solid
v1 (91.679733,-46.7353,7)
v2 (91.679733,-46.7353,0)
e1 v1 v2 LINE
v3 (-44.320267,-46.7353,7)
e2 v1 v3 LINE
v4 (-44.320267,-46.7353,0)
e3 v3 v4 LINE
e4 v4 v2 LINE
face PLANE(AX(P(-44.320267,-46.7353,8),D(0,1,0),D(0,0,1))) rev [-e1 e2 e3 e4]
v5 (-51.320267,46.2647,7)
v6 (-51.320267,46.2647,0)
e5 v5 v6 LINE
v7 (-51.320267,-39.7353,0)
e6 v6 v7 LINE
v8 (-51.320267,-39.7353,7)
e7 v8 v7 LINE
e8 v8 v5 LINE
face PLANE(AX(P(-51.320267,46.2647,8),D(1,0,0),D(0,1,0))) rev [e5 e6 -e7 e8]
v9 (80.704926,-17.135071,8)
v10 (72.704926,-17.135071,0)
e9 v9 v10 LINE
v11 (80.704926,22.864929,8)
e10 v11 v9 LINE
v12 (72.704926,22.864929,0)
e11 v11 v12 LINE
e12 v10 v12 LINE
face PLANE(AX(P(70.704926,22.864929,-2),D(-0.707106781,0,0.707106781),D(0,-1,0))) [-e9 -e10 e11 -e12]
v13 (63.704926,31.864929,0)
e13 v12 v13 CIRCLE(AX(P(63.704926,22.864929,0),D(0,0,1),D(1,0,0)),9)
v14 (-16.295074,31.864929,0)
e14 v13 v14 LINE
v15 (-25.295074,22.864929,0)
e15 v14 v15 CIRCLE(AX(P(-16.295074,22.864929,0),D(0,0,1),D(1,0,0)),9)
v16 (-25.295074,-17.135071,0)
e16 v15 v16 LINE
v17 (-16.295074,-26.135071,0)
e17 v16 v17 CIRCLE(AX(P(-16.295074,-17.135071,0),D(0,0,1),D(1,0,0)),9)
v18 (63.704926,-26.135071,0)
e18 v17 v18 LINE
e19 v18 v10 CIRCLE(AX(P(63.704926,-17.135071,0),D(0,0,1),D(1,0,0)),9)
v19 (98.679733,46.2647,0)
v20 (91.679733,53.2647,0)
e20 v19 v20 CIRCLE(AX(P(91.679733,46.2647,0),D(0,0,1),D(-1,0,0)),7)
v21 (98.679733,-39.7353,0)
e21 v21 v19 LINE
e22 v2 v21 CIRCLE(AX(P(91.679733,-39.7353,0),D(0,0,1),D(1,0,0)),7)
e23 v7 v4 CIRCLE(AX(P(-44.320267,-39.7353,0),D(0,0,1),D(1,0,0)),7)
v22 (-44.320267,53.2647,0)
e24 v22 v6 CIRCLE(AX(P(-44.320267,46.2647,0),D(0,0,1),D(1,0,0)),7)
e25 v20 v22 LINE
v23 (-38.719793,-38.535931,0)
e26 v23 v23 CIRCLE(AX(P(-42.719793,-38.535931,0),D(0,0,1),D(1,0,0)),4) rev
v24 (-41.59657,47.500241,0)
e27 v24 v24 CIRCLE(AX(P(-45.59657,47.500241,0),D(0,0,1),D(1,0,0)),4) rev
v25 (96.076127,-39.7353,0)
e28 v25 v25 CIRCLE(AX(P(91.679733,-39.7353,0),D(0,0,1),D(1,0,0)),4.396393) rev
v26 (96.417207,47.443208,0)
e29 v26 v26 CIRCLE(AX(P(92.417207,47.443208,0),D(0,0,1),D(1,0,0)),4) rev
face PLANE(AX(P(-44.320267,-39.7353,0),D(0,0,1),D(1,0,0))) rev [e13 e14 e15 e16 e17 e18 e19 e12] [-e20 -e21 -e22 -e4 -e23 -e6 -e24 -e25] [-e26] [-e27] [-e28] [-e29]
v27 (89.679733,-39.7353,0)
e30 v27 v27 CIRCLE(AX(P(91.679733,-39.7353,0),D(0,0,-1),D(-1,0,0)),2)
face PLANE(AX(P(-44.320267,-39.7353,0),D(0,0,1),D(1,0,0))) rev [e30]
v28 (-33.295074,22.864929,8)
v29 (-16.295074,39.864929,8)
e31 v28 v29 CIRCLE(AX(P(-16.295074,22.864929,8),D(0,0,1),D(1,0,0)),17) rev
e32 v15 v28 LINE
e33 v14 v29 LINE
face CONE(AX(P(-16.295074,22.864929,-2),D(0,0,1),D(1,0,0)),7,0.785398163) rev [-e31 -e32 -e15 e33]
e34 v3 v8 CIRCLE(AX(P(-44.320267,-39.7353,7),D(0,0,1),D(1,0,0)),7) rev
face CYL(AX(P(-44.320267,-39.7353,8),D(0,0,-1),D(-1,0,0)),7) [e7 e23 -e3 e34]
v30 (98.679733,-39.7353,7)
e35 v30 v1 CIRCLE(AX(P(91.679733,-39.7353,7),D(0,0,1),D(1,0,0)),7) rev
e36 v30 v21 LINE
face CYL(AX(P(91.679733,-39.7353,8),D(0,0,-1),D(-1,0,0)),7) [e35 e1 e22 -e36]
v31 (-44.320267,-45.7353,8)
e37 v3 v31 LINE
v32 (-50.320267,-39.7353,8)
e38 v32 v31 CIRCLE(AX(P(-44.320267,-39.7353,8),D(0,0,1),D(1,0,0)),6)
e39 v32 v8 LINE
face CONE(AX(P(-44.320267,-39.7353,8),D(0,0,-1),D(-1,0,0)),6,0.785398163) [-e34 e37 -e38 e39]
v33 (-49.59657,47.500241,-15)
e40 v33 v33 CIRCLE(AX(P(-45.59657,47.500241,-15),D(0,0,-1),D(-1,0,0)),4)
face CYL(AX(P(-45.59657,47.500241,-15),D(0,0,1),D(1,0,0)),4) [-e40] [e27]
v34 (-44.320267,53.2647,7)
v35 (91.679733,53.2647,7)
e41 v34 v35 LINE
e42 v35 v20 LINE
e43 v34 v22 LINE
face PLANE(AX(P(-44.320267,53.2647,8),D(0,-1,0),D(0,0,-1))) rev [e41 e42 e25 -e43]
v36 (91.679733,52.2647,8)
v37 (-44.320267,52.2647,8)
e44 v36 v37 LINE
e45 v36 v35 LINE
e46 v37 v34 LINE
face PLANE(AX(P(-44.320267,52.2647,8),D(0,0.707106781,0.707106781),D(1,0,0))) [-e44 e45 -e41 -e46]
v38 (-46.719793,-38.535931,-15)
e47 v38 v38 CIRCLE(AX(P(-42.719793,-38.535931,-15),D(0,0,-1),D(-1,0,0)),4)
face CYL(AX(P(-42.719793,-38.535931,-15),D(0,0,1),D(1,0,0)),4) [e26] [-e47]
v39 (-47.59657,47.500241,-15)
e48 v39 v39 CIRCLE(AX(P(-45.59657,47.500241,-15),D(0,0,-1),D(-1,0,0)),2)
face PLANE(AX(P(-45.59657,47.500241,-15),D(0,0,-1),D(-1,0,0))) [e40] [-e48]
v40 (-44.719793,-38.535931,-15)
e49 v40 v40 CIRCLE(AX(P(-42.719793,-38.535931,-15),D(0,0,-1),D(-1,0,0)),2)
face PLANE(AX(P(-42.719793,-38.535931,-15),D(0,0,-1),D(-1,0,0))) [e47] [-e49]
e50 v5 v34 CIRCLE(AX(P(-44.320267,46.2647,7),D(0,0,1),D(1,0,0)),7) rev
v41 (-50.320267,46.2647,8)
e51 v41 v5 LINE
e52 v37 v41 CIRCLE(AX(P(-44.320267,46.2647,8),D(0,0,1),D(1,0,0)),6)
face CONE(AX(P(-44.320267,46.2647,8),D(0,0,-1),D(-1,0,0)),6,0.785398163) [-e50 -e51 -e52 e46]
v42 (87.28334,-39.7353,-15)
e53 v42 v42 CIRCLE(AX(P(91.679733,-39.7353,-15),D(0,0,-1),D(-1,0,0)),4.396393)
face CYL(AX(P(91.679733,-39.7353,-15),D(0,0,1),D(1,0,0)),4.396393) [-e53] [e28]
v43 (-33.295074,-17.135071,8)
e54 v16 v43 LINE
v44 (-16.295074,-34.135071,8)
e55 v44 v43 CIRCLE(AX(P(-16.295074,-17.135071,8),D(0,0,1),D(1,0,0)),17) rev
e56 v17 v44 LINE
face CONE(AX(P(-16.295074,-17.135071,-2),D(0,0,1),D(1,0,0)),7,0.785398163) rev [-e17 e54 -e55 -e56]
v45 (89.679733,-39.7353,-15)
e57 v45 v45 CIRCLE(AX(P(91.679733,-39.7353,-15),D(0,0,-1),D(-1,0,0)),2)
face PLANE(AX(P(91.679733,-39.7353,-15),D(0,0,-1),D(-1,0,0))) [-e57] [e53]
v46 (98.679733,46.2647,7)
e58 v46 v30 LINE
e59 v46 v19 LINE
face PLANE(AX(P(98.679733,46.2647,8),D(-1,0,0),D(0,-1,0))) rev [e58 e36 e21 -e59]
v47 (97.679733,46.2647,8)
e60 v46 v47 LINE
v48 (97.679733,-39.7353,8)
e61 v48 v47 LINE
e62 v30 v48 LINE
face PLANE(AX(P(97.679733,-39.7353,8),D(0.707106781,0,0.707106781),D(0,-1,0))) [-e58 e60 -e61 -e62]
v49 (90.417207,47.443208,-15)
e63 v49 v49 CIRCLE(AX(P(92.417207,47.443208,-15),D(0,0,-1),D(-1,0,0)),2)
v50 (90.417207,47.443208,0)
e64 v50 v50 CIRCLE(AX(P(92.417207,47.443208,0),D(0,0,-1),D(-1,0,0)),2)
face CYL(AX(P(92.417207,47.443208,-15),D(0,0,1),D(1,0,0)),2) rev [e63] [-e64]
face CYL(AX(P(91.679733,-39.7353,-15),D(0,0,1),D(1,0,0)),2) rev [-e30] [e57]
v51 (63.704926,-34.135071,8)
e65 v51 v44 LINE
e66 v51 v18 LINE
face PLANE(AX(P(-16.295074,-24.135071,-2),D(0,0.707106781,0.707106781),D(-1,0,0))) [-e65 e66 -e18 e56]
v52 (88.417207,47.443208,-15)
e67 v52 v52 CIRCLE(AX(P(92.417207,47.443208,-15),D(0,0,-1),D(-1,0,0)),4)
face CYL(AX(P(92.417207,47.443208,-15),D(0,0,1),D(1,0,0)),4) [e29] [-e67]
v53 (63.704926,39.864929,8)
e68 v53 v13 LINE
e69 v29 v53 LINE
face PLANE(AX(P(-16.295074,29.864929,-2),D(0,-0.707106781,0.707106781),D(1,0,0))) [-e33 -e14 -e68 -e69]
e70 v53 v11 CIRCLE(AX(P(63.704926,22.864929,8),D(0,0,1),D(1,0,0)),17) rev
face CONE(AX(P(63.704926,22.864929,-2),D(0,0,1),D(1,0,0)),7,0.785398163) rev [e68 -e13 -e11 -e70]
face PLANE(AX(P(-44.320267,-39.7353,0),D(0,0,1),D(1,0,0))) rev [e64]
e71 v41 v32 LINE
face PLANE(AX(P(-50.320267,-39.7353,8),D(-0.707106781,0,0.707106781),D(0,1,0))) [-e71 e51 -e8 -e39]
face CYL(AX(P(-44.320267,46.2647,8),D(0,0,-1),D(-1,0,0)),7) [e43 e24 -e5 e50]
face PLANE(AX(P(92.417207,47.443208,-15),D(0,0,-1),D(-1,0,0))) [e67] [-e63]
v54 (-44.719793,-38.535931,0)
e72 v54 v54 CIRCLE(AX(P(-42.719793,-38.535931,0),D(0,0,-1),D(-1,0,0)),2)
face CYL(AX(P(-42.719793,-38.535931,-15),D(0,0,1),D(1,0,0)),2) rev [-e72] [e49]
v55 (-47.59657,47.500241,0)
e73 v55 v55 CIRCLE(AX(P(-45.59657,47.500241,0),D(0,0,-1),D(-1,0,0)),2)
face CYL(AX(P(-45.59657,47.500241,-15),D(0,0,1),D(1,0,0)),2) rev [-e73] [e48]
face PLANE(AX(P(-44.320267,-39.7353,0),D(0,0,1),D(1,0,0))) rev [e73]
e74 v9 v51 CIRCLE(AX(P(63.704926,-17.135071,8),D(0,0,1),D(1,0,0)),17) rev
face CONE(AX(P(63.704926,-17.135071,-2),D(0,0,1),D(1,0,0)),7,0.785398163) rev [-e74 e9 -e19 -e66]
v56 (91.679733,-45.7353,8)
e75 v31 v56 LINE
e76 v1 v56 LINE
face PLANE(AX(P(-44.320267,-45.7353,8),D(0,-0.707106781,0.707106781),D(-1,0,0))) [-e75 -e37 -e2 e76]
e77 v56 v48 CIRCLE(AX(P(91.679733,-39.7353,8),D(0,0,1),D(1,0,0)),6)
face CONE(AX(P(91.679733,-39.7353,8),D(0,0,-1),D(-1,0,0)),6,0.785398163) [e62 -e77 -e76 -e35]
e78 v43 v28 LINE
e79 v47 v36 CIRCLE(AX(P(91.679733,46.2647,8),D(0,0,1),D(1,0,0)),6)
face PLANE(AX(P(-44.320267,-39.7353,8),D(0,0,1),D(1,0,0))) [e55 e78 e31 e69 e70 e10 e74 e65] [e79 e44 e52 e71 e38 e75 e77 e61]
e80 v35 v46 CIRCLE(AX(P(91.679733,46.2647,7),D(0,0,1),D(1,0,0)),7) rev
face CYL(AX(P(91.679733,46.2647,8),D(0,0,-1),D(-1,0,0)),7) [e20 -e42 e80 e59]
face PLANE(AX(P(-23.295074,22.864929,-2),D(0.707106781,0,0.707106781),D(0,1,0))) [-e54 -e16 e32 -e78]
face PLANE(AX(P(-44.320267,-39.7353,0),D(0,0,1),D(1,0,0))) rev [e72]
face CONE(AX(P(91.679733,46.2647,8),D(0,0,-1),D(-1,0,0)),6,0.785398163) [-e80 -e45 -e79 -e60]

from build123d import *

# Parameters (mm, degrees)
EXTRUDE_1_DEPTH     = 8
CUT_EXTRUDE_1_DEPTH = 8
CHAMFER_2_SIZE      = 1
SKETCH_3_R          = 4
SKETCH_3_R_2        = 2
EXTRUDE_3_DEPTH     = 15
SKETCH_5_R          = 4.396393258
SKETCH_5_R_2        = 2
EXTRUDE_4_DEPTH     = 15
SKETCH_9_R          = 4
SKETCH_9_R_2        = 2
EXTRUDE_5_DEPTH     = 15
SKETCH_10_R         = 4
SKETCH_10_R_2       = 2
EXTRUDE_6_DEPTH     = 15
CHAMFER_6_SIZE      = 10


with BuildPart() as part:
    # 草图1 → 凸台-拉伸1 (new body)
    with BuildSketch(Plane.XY):
        with BuildLine():
            Line((-44.320266629, 53.264700042), (91.679733371, 53.264700042))
            ThreePointArc((91.679733371, 53.264700042), (96.629480839, 51.21444751), (98.679733371, 46.264700042))
            Line((98.679733371, 46.264700042), (98.679733371, -39.735299958))
            ThreePointArc((98.679733371, -39.735299958), (96.629480839, -44.685047426), (91.679733371, -46.735299958))
            Line((91.679733371, -46.735299958), (-44.320266629, -46.735299958))
            ThreePointArc((-44.320266629, -46.735299958), (-49.270014098, -44.685047426), (-51.320266629, -39.735299958))
            Line((-51.320266629, -39.735299958), (-51.320266629, 46.264700042))
            ThreePointArc((-51.320266629, 46.264700042), (-49.270014098, 51.21444751), (-44.320266629, 53.264700042))
        make_face()
    extrude(amount=EXTRUDE_1_DEPTH)

    # 草图2 → 切除-拉伸1 (cut)
    with BuildSketch(Plane.XY.offset(8)):
        with BuildLine():
            Line((-16.295074043, 29.864928603), (63.704925957, 29.864928603))
            ThreePointArc((63.704925957, 29.864928603), (68.654673426, 27.814676072), (70.704925957, 22.864928603))
            Line((70.704925957, 22.864928603), (70.704925957, -17.135071397))
            ThreePointArc((70.704925957, -17.135071397), (68.654673426, -22.084818865), (63.704925957, -24.135071397))
            Line((63.704925957, -24.135071397), (-16.295074043, -24.135071397))
            ThreePointArc((-16.295074043, -24.135071397), (-21.244821511, -22.084818865), (-23.295074043, -17.135071397))
            Line((-23.295074043, -17.135071397), (-23.295074043, 22.864928603))
            ThreePointArc((-23.295074043, 22.864928603), (-21.244821511, 27.814676072), (-16.295074043, 29.864928603))
        make_face()
    extrude(amount=-CUT_EXTRUDE_1_DEPTH, mode=Mode.SUBTRACT)

    # 倒角2
    chamfer_2_edges = [part.edges().sort_by_distance(p)[0] for p in [
        (96.629480839, -44.685047426, 8),
        (98.679733371, 3.264700042, 8),
        (96.629480839, 51.21444751, 8),
        (23.679733371, 53.264700042, 8),
        (-49.270014098, 51.21444751, 8),
        (-51.320266629, 3.264700042, 8),
        (-49.270014098, -44.685047426, 8),
        (23.679733371, -46.735299958, 8),
    ]]
    chamfer(chamfer_2_edges, length=CHAMFER_2_SIZE)

    # 草图3 → 凸台-拉伸3 (add)
    with BuildSketch(Plane(origin=(0, 0, 0), x_dir=(-1, 0, 0), z_dir=(0, 0, -1))):
        with Locations(Location((-92.417207429, 47.443208316, 0), (0, 0, 180))):
            Circle(SKETCH_3_R)
        with Locations((-92.417207429, 47.443208316)):
            Circle(SKETCH_3_R_2, mode=Mode.SUBTRACT)
    extrude(amount=EXTRUDE_3_DEPTH)

    # 草图5 → 凸台-拉伸4 (add)
    with BuildSketch(Plane(origin=(0, 0, 0), x_dir=(-1, 0, 0), z_dir=(0, 0, -1))):
        with Locations(Location((-91.679733371, -39.735299958, 0), (0, 0, 180))):
            Circle(SKETCH_5_R)
        with Locations((-91.679733371, -39.735299958)):
            Circle(SKETCH_5_R_2, mode=Mode.SUBTRACT)
    extrude(amount=EXTRUDE_4_DEPTH)

    # 草图9 → 凸台-拉伸5 (add)
    with BuildSketch(Plane(origin=(0, 0, 0), x_dir=(-1, 0, 0), z_dir=(0, 0, -1))):
        with Locations(Location((45.596569925, 47.500240672, 0), (0, 0, 180))):
            Circle(SKETCH_9_R)
        with Locations((45.596569925, 47.500240672)):
            Circle(SKETCH_9_R_2, mode=Mode.SUBTRACT)
    extrude(amount=EXTRUDE_5_DEPTH)

    # 草图10 → 凸台-拉伸6 (add)
    with BuildSketch(Plane(origin=(0, 0, 0), x_dir=(-1, 0, 0), z_dir=(0, 0, -1))):
        with Locations(Location((42.719793233, -38.535931412, 0), (0, 0, 180))):
            Circle(SKETCH_10_R)
        with Locations((42.719793233, -38.535931412)):
            Circle(SKETCH_10_R_2, mode=Mode.SUBTRACT)
    extrude(amount=EXTRUDE_6_DEPTH)

    # 倒角6
    # the kernel refuses this chamfer: 10 mm, written as the material it takes off along each edge
    with BuildSketch(Plane(origin=(63.704925957, -24.135071397, 8), x_dir=(0, -0.9996219169112968, 0.027495876610586317), z_dir=(-1, 0, 0)), Plane(origin=(-16.295074043, 29.864928603, 8), x_dir=(0, 0.9996219169112968, 0.027495876610586317), z_dir=(1, 0, 0))) as chamfer_6_piece_1:
        Polygon((CHAMFER_6_SIZE * 0.999621916911, -CHAMFER_6_SIZE * 0.0274958766106), (-CHAMFER_6_SIZE * 0.0274958766106, -CHAMFER_6_SIZE * 0.999621916911), (0, 0), align=None)
    extrude(amount=80, mode=Mode.SUBTRACT)
    with BuildSketch(Plane(origin=(63.704925957, -17.135071397, 8), x_dir=(1, 0, 0), z_dir=(0, 1, 0))) as chamfer_6_piece_2:
        Polygon((7 + CHAMFER_6_SIZE, 0), (7, CHAMFER_6_SIZE), (7, 0), align=None)
    revolve(axis=Axis((63.704925957, -17.135071397, 8), (0, 0, -1)), revolution_arc=90, mode=Mode.SUBTRACT)
    with BuildSketch(Plane(origin=(70.704925957, 22.864928603, 8), x_dir=(0.9996219169112968, 0, 0.027495876610586317), z_dir=(0, -1, 0)), Plane(origin=(-23.295074043, -17.135071397, 8), x_dir=(-0.9996219169112968, 0, 0.02749587661058631), z_dir=(0, 1, 0))) as chamfer_6_piece_3:
        Polygon((CHAMFER_6_SIZE * 0.999621916911, -CHAMFER_6_SIZE * 0.0274958766106), (-CHAMFER_6_SIZE * 0.0274958766106, -CHAMFER_6_SIZE * 0.999621916911), (0, 0), align=None)
    extrude(amount=40, mode=Mode.SUBTRACT)
    with BuildSketch(Plane(origin=(63.704925957, 22.864928603, 8), x_dir=(0, 1, 0), z_dir=(-1, 0, 0))) as chamfer_6_piece_4:
        Polygon((7 + CHAMFER_6_SIZE, 0), (7, CHAMFER_6_SIZE), (7, 0), align=None)
    revolve(axis=Axis((63.704925957, 22.864928603, 8), (0, 0, -1)), revolution_arc=90, mode=Mode.SUBTRACT)
    with BuildSketch(Plane(origin=(-16.295074043, -17.135071397, 8), x_dir=(0, -1, 0), z_dir=(1, 0, 0))) as chamfer_6_piece_5:
        Polygon((7 + CHAMFER_6_SIZE, 0), (7, CHAMFER_6_SIZE), (7, 0), align=None)
    revolve(axis=Axis((-16.295074043, -17.135071397, 8), (0, 0, -1)), revolution_arc=90, mode=Mode.SUBTRACT)
    with BuildSketch(Plane(origin=(-16.295074043, 22.864928603, 8), x_dir=(-1, 0, 0), z_dir=(0, -1, 0))) as chamfer_6_piece_6:
        Polygon((7 + CHAMFER_6_SIZE, 0), (7, CHAMFER_6_SIZE), (7, 0), align=None)
    revolve(axis=Axis((-16.295074043, 22.864928603, 8), (0, 0, -1)), revolution_arc=90, mode=Mode.SUBTRACT)


solid = part.part
